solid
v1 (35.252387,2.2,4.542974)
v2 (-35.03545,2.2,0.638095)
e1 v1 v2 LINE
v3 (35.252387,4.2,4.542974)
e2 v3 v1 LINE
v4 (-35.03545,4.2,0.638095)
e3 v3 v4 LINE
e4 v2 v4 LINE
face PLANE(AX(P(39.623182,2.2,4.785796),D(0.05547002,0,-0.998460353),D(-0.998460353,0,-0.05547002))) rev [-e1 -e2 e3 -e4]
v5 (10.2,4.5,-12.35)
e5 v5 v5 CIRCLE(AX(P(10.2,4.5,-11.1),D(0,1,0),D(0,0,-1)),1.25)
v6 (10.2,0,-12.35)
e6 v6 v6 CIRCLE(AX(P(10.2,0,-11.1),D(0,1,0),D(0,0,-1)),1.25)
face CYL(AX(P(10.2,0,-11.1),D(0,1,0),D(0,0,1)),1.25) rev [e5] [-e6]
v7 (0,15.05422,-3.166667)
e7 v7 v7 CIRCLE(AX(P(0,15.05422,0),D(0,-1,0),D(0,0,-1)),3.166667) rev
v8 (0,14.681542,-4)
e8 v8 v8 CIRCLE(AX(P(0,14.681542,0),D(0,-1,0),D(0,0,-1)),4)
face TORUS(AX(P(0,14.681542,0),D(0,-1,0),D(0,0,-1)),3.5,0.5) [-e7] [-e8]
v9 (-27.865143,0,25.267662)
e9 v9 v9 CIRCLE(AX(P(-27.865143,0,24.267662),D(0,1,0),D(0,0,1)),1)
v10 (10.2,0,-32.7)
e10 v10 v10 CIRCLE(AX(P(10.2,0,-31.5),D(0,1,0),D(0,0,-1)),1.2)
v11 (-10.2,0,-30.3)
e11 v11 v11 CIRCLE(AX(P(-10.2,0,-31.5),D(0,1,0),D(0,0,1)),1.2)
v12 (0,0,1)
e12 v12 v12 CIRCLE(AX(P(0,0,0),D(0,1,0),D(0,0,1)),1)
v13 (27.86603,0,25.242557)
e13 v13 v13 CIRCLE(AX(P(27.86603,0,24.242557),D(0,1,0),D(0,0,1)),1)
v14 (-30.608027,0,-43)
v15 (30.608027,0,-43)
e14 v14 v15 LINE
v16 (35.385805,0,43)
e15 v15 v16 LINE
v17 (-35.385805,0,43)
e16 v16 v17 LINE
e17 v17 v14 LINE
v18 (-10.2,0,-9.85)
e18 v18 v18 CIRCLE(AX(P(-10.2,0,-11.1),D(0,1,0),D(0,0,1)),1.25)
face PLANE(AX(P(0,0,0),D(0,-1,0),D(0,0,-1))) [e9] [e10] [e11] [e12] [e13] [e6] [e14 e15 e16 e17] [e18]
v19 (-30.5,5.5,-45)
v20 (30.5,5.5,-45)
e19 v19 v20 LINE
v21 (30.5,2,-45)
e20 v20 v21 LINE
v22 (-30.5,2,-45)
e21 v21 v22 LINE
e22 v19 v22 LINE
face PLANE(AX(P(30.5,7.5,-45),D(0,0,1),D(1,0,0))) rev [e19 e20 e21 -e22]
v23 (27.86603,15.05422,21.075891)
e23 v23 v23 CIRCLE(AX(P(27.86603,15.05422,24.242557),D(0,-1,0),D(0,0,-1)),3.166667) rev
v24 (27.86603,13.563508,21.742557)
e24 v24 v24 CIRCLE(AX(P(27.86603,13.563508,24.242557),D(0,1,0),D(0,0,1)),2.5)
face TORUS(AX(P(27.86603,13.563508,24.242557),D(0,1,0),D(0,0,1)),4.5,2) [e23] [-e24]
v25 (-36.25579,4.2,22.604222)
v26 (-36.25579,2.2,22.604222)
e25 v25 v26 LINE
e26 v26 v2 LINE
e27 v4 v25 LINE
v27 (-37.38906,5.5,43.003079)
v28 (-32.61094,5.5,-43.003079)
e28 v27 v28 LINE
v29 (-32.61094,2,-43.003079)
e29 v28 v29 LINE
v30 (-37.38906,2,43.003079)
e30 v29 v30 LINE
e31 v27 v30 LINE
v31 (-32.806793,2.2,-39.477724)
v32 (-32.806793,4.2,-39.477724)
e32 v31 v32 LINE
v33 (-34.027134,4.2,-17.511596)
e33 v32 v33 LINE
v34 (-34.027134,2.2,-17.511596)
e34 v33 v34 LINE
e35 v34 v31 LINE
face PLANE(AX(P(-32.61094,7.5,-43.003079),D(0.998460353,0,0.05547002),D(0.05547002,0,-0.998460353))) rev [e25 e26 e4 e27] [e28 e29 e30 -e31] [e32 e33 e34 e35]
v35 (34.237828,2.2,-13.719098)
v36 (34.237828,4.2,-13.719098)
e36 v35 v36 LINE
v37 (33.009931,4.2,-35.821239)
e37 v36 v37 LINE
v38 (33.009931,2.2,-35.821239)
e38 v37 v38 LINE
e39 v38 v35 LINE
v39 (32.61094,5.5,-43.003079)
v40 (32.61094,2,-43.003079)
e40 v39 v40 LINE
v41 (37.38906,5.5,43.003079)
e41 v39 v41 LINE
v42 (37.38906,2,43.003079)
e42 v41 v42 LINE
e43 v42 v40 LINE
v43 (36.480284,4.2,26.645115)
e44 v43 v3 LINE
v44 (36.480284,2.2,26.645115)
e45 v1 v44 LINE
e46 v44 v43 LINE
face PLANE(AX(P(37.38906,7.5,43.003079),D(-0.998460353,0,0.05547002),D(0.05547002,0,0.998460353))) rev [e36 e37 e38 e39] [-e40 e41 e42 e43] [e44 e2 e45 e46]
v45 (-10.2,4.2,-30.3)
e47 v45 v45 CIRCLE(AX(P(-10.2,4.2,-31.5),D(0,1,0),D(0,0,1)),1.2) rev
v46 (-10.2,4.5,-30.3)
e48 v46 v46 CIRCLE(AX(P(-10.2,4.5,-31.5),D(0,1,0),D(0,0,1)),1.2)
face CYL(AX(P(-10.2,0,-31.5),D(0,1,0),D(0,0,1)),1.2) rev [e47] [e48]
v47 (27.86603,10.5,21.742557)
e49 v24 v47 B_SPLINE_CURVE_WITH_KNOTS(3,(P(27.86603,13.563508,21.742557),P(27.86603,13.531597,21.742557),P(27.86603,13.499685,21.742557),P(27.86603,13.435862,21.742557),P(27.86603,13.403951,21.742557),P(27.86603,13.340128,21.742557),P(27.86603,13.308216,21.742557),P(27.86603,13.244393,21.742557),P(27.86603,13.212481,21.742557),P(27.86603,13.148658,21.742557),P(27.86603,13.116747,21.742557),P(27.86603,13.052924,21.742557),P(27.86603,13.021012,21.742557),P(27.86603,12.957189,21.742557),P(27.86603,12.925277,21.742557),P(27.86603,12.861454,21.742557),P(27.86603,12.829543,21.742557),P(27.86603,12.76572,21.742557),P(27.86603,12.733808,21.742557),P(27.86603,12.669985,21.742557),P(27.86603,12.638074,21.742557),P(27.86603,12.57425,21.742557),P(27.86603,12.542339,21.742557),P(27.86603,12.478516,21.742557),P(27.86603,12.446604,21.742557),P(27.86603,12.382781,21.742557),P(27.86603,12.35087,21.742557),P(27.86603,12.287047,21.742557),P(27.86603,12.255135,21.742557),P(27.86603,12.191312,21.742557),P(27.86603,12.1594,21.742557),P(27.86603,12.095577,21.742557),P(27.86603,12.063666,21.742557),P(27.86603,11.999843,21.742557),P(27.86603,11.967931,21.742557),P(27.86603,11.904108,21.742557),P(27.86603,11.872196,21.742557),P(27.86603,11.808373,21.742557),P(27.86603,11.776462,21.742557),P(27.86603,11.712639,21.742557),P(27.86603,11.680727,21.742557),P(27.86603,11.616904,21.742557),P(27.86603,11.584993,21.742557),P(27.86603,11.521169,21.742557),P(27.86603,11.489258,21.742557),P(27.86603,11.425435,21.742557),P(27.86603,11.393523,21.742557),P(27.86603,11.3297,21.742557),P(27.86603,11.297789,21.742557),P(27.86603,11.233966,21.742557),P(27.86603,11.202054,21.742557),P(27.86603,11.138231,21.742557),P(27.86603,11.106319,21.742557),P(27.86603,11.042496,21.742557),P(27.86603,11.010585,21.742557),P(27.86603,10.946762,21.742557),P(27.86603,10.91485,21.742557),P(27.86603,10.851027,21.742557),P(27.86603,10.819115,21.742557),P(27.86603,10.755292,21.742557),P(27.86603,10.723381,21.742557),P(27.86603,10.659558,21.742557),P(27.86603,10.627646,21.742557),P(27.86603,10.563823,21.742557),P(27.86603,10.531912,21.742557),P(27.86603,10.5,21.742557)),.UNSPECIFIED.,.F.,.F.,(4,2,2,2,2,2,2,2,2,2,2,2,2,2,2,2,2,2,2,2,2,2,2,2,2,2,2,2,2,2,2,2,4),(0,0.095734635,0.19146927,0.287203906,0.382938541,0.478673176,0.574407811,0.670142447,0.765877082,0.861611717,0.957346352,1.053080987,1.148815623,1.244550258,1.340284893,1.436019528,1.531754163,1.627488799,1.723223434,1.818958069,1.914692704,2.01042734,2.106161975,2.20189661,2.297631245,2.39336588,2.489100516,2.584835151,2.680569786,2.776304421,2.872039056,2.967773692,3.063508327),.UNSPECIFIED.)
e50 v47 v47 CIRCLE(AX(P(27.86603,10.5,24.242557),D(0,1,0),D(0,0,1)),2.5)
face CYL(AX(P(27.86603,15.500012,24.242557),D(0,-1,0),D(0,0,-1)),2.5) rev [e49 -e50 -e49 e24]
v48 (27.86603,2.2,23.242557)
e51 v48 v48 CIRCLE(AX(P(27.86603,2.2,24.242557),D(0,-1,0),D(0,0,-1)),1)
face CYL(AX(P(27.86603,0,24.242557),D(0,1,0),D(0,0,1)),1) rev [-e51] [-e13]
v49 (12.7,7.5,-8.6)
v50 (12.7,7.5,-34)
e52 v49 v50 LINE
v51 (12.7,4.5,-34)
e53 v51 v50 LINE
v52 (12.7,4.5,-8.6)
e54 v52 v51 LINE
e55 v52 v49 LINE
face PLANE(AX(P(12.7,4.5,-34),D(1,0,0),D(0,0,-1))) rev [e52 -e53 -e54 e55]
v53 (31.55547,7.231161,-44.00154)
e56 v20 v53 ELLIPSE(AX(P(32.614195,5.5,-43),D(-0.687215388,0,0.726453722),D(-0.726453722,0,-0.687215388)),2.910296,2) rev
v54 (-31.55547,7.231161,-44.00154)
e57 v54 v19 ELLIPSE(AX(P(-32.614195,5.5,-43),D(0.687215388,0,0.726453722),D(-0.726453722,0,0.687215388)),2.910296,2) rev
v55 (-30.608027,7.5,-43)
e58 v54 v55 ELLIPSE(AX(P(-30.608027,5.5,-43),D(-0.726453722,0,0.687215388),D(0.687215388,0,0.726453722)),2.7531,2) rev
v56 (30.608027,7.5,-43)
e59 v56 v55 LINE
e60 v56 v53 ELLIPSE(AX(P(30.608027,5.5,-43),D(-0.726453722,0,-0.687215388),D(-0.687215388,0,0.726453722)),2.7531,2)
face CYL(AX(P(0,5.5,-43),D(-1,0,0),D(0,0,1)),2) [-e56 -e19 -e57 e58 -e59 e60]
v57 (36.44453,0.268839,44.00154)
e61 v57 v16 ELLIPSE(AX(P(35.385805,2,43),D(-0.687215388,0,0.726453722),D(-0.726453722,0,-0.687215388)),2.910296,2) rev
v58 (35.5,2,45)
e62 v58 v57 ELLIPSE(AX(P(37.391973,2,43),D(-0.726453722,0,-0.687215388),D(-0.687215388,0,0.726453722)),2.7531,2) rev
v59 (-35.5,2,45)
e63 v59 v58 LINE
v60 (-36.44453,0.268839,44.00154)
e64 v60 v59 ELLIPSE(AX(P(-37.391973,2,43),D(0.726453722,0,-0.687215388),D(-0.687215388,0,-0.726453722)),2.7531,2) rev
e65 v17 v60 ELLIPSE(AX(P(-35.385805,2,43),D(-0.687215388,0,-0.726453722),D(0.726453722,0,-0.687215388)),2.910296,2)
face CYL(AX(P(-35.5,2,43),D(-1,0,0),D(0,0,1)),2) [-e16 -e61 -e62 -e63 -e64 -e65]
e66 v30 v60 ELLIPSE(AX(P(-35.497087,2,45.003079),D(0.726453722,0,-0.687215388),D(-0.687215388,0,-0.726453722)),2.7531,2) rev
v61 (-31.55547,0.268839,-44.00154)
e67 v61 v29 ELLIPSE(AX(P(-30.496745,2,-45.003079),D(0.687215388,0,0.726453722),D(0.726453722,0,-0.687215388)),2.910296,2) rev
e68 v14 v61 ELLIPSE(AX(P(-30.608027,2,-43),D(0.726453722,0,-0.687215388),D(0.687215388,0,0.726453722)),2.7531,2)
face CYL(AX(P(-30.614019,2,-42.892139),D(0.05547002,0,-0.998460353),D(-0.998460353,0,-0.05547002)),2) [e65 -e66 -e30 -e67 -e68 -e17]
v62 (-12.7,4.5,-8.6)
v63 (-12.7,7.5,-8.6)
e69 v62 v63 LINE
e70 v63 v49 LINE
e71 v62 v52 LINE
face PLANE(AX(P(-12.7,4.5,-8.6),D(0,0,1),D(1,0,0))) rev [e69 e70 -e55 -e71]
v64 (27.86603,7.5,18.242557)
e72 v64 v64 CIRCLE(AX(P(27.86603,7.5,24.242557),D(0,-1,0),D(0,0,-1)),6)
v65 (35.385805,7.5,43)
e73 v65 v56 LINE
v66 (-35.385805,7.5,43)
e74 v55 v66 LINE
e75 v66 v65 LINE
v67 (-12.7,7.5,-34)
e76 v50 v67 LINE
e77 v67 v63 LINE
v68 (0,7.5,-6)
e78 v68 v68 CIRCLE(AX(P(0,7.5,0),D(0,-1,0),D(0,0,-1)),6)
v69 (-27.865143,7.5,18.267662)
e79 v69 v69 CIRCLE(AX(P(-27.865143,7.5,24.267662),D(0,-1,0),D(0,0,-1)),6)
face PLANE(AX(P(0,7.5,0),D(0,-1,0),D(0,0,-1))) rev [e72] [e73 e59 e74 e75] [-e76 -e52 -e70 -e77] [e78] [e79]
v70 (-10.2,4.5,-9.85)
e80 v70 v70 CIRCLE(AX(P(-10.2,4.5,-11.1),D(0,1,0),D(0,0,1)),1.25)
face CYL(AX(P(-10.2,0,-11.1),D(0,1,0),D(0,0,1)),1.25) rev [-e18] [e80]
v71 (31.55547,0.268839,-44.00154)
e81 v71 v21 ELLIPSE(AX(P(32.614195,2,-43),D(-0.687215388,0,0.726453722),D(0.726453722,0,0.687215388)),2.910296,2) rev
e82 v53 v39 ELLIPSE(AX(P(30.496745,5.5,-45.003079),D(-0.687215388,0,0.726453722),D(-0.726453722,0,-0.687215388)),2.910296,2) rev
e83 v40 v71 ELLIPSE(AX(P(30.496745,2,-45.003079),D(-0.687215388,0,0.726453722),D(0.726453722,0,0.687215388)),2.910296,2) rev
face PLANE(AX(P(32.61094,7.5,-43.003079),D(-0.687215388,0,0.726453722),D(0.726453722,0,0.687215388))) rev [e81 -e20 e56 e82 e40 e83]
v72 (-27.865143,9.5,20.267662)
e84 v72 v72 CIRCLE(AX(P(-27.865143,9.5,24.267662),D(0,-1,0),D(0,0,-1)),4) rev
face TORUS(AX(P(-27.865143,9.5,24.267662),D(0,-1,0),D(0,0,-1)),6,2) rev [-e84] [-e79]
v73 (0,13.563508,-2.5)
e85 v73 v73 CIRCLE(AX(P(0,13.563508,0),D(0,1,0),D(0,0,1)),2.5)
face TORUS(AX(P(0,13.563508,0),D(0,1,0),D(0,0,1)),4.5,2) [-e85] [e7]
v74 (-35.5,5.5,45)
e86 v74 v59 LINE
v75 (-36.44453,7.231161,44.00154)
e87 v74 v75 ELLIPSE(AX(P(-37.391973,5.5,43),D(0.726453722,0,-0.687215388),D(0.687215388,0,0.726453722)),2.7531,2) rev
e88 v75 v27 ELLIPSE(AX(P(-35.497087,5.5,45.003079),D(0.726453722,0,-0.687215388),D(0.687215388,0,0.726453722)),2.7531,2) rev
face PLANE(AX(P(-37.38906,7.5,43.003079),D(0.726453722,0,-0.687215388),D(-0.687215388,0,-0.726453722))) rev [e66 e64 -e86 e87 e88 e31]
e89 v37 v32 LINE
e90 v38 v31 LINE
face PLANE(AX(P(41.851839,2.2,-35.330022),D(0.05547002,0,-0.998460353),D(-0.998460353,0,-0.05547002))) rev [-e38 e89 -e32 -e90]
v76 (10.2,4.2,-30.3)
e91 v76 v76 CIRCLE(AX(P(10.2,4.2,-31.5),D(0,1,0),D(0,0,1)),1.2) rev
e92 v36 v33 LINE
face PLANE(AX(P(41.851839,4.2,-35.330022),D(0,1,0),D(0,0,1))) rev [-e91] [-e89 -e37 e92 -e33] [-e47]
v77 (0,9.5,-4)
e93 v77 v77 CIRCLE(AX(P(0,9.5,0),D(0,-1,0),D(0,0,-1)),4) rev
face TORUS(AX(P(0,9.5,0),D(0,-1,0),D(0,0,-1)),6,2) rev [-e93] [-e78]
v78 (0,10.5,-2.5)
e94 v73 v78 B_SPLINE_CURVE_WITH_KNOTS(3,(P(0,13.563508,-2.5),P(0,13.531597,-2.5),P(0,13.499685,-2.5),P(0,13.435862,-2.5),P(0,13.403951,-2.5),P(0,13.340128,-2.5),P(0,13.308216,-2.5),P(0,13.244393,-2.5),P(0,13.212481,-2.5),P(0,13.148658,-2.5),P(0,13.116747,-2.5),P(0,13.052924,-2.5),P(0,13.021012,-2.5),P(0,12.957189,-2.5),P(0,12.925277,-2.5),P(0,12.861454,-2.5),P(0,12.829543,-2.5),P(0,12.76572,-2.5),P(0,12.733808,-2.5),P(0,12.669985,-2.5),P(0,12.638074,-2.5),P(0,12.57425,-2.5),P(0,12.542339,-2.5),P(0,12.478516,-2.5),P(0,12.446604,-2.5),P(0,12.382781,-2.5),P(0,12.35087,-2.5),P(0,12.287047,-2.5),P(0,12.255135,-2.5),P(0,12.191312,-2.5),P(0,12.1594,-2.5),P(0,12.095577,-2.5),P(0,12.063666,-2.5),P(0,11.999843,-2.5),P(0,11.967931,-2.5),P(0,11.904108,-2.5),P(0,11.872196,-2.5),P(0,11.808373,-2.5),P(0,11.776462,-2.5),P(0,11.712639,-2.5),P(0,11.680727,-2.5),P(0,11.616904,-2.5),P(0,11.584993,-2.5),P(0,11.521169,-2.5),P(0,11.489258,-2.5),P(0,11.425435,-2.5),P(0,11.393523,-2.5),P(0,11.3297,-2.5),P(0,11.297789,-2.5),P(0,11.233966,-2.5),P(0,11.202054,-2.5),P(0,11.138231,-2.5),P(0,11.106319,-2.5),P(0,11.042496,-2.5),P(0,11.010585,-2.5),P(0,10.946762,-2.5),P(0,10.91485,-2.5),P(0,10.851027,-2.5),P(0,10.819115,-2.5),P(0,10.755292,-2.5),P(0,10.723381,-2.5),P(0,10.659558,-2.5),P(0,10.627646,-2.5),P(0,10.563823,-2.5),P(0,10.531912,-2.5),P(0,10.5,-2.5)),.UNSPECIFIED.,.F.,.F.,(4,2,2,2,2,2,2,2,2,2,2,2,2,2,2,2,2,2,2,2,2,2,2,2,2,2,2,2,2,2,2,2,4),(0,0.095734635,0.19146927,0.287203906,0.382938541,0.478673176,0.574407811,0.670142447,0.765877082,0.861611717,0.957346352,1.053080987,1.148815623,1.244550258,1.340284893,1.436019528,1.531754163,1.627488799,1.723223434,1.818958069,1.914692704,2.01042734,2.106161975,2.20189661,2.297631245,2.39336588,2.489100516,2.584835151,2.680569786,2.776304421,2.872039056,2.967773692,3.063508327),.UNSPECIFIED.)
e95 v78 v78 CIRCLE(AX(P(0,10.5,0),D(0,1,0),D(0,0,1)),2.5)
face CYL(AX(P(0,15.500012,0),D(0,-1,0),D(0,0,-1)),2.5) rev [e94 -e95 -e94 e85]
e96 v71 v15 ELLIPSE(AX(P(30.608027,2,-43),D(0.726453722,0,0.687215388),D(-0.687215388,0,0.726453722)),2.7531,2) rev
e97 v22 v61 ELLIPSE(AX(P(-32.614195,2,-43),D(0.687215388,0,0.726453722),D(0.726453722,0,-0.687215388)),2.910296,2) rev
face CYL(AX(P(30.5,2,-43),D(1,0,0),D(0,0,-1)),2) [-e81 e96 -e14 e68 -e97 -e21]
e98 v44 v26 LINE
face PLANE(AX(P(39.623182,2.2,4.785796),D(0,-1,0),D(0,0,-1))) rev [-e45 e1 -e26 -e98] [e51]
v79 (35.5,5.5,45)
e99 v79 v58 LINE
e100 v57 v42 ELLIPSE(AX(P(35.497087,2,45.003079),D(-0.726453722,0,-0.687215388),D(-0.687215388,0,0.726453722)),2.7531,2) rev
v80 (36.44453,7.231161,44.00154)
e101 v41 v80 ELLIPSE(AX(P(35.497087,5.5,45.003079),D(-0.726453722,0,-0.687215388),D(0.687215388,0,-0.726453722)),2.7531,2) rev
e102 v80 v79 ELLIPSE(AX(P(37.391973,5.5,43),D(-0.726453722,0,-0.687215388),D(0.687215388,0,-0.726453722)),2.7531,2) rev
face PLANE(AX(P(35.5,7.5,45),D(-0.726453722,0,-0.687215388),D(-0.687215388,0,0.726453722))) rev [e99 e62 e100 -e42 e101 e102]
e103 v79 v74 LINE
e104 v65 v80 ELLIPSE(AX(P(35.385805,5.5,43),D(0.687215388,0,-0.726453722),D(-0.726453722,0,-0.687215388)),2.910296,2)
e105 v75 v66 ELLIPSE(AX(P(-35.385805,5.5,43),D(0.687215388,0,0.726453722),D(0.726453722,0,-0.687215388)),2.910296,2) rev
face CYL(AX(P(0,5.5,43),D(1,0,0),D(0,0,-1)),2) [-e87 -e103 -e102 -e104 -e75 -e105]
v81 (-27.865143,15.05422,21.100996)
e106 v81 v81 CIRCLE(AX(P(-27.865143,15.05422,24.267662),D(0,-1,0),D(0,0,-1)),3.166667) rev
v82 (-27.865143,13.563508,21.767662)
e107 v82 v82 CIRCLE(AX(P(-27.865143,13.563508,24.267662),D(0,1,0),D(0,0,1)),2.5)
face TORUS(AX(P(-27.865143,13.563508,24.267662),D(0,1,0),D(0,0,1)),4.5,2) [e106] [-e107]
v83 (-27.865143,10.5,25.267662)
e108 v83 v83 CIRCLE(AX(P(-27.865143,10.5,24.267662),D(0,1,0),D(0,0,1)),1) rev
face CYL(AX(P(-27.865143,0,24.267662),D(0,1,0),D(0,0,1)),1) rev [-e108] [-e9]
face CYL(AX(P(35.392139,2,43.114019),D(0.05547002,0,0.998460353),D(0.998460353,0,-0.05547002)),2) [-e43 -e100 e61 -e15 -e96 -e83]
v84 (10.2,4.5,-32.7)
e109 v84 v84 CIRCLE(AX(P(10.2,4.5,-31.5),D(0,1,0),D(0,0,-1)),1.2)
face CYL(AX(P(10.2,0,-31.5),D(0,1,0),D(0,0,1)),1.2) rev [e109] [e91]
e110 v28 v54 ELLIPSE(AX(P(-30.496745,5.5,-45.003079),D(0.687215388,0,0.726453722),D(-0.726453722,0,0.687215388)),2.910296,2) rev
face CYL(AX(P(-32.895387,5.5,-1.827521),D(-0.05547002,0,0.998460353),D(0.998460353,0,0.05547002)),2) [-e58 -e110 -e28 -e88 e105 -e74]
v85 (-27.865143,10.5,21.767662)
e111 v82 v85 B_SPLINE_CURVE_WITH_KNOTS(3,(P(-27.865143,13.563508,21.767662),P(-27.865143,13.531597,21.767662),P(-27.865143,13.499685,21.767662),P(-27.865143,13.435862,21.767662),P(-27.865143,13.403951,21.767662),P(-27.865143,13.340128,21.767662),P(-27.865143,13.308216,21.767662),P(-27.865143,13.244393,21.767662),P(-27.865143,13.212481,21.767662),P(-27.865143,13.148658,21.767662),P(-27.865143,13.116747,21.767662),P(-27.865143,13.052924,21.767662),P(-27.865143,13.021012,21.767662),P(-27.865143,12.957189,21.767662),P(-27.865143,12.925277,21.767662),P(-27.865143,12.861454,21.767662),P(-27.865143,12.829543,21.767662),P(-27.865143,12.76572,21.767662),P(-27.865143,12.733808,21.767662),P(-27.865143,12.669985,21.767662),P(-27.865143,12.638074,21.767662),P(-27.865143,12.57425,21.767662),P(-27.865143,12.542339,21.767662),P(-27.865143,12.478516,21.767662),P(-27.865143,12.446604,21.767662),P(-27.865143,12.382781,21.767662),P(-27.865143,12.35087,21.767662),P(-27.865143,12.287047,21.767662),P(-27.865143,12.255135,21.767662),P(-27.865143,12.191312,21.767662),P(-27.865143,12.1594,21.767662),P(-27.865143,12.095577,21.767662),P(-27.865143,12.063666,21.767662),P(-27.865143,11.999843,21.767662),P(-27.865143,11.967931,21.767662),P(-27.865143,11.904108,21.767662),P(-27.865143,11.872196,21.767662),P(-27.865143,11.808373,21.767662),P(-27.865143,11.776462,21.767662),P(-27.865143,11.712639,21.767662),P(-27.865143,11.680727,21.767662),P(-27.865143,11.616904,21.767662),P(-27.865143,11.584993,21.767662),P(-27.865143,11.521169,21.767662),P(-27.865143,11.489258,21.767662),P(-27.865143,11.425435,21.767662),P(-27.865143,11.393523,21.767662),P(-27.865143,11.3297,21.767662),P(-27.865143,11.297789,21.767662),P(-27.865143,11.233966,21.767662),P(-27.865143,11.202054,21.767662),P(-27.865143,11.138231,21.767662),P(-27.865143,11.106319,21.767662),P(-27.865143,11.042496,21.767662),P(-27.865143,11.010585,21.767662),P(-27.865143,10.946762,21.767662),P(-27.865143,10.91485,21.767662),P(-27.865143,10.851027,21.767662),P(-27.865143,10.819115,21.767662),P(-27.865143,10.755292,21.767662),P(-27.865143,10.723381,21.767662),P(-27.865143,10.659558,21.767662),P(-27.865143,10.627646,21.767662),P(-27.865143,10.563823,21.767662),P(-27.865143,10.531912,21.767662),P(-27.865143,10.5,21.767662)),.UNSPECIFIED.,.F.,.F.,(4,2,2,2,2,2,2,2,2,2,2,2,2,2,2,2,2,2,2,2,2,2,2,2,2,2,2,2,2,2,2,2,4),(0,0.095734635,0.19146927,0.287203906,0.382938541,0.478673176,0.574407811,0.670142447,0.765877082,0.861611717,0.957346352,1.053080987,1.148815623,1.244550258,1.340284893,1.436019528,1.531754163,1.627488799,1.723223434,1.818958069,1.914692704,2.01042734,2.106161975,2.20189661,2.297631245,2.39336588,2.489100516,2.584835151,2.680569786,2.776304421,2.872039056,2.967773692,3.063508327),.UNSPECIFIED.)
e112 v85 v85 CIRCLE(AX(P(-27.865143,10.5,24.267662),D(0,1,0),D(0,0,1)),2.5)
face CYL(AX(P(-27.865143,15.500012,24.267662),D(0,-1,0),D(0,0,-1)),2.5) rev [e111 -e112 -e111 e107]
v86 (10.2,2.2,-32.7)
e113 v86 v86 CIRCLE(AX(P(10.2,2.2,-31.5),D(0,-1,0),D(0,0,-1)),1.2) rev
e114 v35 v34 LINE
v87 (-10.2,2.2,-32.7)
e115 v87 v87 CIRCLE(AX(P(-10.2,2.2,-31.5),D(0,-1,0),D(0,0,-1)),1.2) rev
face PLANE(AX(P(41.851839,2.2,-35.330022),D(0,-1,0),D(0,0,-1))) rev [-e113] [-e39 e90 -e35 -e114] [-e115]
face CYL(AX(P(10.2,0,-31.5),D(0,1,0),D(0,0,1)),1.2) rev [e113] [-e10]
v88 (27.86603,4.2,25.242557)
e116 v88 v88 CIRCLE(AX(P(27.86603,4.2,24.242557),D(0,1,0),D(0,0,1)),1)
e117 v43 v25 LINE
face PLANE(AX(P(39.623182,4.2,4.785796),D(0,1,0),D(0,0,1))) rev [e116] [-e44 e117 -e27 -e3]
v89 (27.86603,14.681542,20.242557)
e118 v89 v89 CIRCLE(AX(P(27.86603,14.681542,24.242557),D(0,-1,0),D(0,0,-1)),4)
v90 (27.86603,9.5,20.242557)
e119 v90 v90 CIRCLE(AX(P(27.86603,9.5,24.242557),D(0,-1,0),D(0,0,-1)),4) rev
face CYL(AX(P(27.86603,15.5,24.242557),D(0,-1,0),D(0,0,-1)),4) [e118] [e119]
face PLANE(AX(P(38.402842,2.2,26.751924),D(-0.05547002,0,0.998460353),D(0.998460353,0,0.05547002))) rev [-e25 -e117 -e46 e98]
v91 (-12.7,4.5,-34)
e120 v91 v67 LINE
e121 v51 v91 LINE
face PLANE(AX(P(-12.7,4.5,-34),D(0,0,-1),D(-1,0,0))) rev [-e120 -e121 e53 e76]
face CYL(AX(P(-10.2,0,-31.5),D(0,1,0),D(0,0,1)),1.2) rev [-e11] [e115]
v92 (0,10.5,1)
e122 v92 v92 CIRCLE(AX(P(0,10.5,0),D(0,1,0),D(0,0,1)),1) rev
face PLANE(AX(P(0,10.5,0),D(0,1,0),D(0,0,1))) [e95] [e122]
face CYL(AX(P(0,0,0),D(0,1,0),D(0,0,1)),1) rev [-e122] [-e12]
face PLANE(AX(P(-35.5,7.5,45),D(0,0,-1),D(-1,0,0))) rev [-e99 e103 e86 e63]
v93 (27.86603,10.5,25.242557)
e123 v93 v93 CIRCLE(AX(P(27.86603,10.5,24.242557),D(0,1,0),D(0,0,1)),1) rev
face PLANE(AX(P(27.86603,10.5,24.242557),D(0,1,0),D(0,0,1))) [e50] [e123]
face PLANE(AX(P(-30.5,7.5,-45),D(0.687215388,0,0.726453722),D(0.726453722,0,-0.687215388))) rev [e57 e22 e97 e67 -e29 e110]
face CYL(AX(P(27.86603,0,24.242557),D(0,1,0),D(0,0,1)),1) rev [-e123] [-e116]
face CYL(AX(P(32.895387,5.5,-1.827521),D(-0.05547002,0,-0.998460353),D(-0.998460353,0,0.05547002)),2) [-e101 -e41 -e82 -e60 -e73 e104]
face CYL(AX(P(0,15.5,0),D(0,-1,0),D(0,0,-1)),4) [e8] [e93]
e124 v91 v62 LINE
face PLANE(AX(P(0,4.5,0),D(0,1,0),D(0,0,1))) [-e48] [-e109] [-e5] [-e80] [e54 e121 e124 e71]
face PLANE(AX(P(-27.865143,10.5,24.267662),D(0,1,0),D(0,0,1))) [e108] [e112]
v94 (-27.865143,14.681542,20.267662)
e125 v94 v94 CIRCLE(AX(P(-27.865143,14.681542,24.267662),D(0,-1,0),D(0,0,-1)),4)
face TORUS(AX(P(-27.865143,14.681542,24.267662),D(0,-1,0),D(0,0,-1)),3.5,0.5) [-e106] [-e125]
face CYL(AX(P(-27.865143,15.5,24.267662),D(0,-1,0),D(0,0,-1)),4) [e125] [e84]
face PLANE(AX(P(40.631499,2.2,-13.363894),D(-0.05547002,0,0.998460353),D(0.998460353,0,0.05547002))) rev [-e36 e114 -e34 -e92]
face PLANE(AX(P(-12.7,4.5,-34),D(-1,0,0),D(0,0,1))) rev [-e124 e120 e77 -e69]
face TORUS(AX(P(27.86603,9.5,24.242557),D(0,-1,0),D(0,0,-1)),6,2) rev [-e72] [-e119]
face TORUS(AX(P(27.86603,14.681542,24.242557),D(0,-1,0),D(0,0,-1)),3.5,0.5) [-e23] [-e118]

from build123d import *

# Parameters (mm, degrees)
BOSS_EXTRUDE2_DEPTH     = 7.5
SKETCH6_W               = 25.4
SKETCH6_H               = 25.4
CUT_EXTRUDE2_DEPTH      = 3
SKETCH8_R               = 1.2
SKETCH8_R_2             = 1.25
CUT_EXTRUDE3_DEPTH      = 59.678716795
SKETCH9_R               = 4
BOSS_EXTRUDE5_DEPTH     = 8
CUT_EXTRUDE4_DEPTH      = 88.567489866
CUT_EXTRUDE4_DEPTH_BACK = 88.567489866
SKETCH11_W              = 22
SKETCH11_H              = 2
CUT_EXTRUDE5_DEPTH      = 61.524307553
CUT_EXTRUDE5_DEPTH_BACK = 61.524307553
SKETCH12_R              = 1
CUT_EXTRUDE6_DEPTH      = 61.524307553
CUT_EXTRUDE6_DEPTH_BACK = 5
SKETCH13_R              = 2.5
FILLET1_R               = 2
FILLET2_R               = 2
FILLET3_R               = 0.5
FILLET4_R               = 2


with BuildPart() as part:
    # Sketch2 → Boss-Extrude2 (new body)
    with BuildSketch(Plane(origin=(0, 0, 0), x_dir=(1, 0, 0), z_dir=(0, 1, 0))):
        Polygon((-35.5, -45), (35.5, -45), (37.389059961, -43.003079294), (32.610940039, 43.003079294), (30.5, 45), (-30.5, 45), (-32.610940039, 43.003079294), (-37.389059961, -43.003079294), align=None)
    extrude(amount=BOSS_EXTRUDE2_DEPTH)

    # Sketch6 → Cut-Extrude2 (cut)
    with BuildSketch(Plane(origin=(0, 7.5, 0), x_dir=(1, 0, 0), z_dir=(0, 1, 0))):
        with Locations((0, 21.3)):
            Rectangle(SKETCH6_W, SKETCH6_H)
    extrude(amount=-CUT_EXTRUDE2_DEPTH, mode=Mode.SUBTRACT)

    # Sketch8 → Cut-Extrude3 (cut, through all)
    with BuildSketch(Plane(origin=(0, 4.5, 0), x_dir=(1, 0, 0), z_dir=(0, 1, 0))):
        with Locations(Location((-10.2, 31.5, 0), (0, 0, 270))):
            Circle(SKETCH8_R)
        with Locations(Location((-10.2, 11.1, 0), (0, 0, 270))):
            Circle(SKETCH8_R_2)
        with Locations(Location((10.2, 11.1, 0), (0, 0, 90))):
            Circle(SKETCH8_R_2)
        with Locations(Location((10.2, 31.5, 0), (0, 0, 90))):
            Circle(SKETCH8_R)
    extrude(amount=-CUT_EXTRUDE3_DEPTH, mode=Mode.SUBTRACT)

    # Sketch9 → Boss-Extrude5 (add)
    with BuildSketch(Plane(origin=(0, 7.5, 0), x_dir=(1, 0, 0), z_dir=(0, 1, 0))):
        with Locations(Location((-27.865142546, -24.267662345, 0), (0, 0, 90))):
            Circle(SKETCH9_R)
        with Locations(Location((27.866029503, -24.242557469, 0), (0, 0, 90))):
            Circle(SKETCH9_R)
        with Locations(Location((0, 0, 0), (0, 0, 90))):
            Circle(SKETCH9_R)
    extrude(amount=BOSS_EXTRUDE5_DEPTH)

    # Sketch11 → Cut-Extrude4 (cut, two sides: drawn at the far end of the back side and taken through both)
    with BuildSketch(Plane(origin=(-34.892307692, 0, -1.938461538), x_dir=(-0.05547001962252269, 0, 0.9984603532054125), z_dir=(-0.9984603532054126, 0, -0.055470019622522695)).offset(-CUT_EXTRUDE4_DEPTH_BACK)):
        with Locations((-26.597148694, 3.2)):
            Rectangle(SKETCH11_W, SKETCH11_H)
        with Locations((13.580529235, 3.2)):
            Rectangle(SKETCH11_W, SKETCH11_H)
    extrude(amount=CUT_EXTRUDE4_DEPTH + CUT_EXTRUDE4_DEPTH_BACK, mode=Mode.SUBTRACT)

    # Sketch12 → Cut-Extrude5 (cut, two sides: drawn at the far end of the back side and taken through both)
    with BuildSketch(Plane(origin=(0, 15.5, 0), x_dir=(1, 0, 0), z_dir=(0, 1, 0)).offset(-CUT_EXTRUDE5_DEPTH_BACK)):
        with Locations(Location((-27.865142546, -24.267662345, 0), (0, 0, 270))):
            Circle(SKETCH12_R)
        with Locations(Location((0, 0, 0), (0, 0, 270))):
            Circle(SKETCH12_R)
        with Locations(Location((27.866029503, -24.242557469, 0), (0, 0, 270))):
            Circle(SKETCH12_R)
    extrude(amount=CUT_EXTRUDE5_DEPTH + CUT_EXTRUDE5_DEPTH_BACK, mode=Mode.SUBTRACT)

    # Sketch13 → Cut-Extrude6 (cut, two sides: drawn at the far end of the back side and taken through both)
    with BuildSketch(Plane(origin=(0, 15.5, 0), x_dir=(1, 0, 0), z_dir=(0, 1, 0)).offset(-CUT_EXTRUDE6_DEPTH_BACK)):
        with Locations(Location((-27.865142546, -24.267662345, 0), (0, 0, 90))):
            Circle(SKETCH13_R)
        with Locations(Location((0, 0, 0), (0, 0, 90))):
            Circle(SKETCH13_R)
        with Locations(Location((27.866029503, -24.242557469, 0), (0, 0, 90))):
            Circle(SKETCH13_R)
    extrude(amount=CUT_EXTRUDE6_DEPTH + CUT_EXTRUDE6_DEPTH_BACK, mode=Mode.SUBTRACT)

    # Fillet1
    # the kernel refuses this fillet: 2 mm, written as the material it takes off along each edge
    with BuildSketch(Plane(origin=(35.5, 0, -45), x_dir=(0, 0, 1), z_dir=(-1, 0, 0))) as fillet1_piece_1:
        with BuildLine():
            CenterArc((FILLET1_R, FILLET1_R), FILLET1_R, 180, 90)
            Line((0, FILLET1_R), (0, 0))
            Line((0, 0), (FILLET1_R, 0))
        make_face()
    extrude(amount=71, mode=Mode.SUBTRACT)
    with BuildSketch(Plane(origin=(35.5, 7.5, -45), x_dir=(0, 0, 1), z_dir=(-1, 0, 0))) as fillet1_piece_2:
        with BuildLine():
            CenterArc((FILLET1_R, -FILLET1_R), FILLET1_R, 90, 90)
            Line((0, -FILLET1_R), (0, 0))
            Line((0, 0), (FILLET1_R, 0))
        make_face()
    extrude(amount=71, mode=Mode.SUBTRACT)
    with BuildSketch(Plane(origin=(37.666410059, 0, 47.99538106), x_dir=(-0.9984603532054125, 0, 0.055470019622522966), z_dir=(-0.05547001962252297, 0, -0.9984603532054125)), Plane(origin=(-32.333589941, 0, -47.99538106), x_dir=(0.9984603532054126, 0, 0.055470019622522654), z_dir=(-0.05547001962252265, 0, 0.9984603532054125))) as fillet1_piece_3:
        with BuildLine():
            CenterArc((FILLET1_R, FILLET1_R), FILLET1_R, 180, 90)
            Line((0, FILLET1_R), (0, 0))
            Line((0, 0), (FILLET1_R, 0))
        make_face()
    extrude(amount=96.138781887, mode=Mode.SUBTRACT)
    with BuildSketch(Plane(origin=(37.666410059, 7.5, 47.99538106), x_dir=(-0.9984603532054125, 0, 0.055470019622522966), z_dir=(-0.05547001962252297, 0, -0.9984603532054125)), Plane(origin=(-32.333589941, 7.5, -47.99538106), x_dir=(0.9984603532054126, 0, 0.055470019622522654), z_dir=(-0.05547001962252265, 0, 0.9984603532054125))) as fillet1_piece_4:
        with BuildLine():
            CenterArc((FILLET1_R, -FILLET1_R), FILLET1_R, 90, 90)
            Line((0, -FILLET1_R), (0, 0))
            Line((0, 0), (FILLET1_R, 0))
        make_face()
    extrude(amount=96.138781887, mode=Mode.SUBTRACT)
    with BuildSketch(Plane(origin=(-40.5, 7.5, 45), x_dir=(0, -1, 0), z_dir=(1, 0, 0))) as fillet1_piece_5:
        with BuildLine():
            CenterArc((FILLET1_R, FILLET1_R), FILLET1_R, 180, 90)
            Line((0, FILLET1_R), (0, 0))
            Line((0, 0), (FILLET1_R, 0))
        make_face()
    extrude(amount=81, mode=Mode.SUBTRACT)
    with BuildSketch(Plane(origin=(-40.5, 0, 45), x_dir=(0, 1, 0), z_dir=(1, 0, 0))) as fillet1_piece_6:
        with BuildLine():
            CenterArc((FILLET1_R, -FILLET1_R), FILLET1_R, 90, 90)
            Line((0, -FILLET1_R), (0, 0))
            Line((0, 0), (FILLET1_R, 0))
        make_face()
    extrude(amount=81, mode=Mode.SUBTRACT)

    # Fillet2
    # the kernel refuses this fillet: 2 mm, written as the material it takes off along each edge
    with BuildSketch(Plane(origin=(-27.865142546, 15.5, 24.267662345), x_dir=(0, 0, -1), z_dir=(1, 0, 0))) as fillet2_piece_1:
        with BuildLine():
            CenterArc((4.5, -1.936491673), FILLET2_R, 104.477512186, 75.522487814)
            Line((2.5, -1.936491673), (2.46, -1.936491673))
            Line((2.46, -1.936491673), (2.46, 0))
            Line((2.46, 0), (2.5, 0.04))
            ThreePointArc((2.5, 0.04), (3.25, 0.04), (3.99, 0.038729833))
            Line((3.99, 0.038729833), (4, 0))
        make_face()
    revolve(axis=Axis((-27.865142546, 15.5, 24.267662345), (0, 1, 0)), mode=Mode.SUBTRACT)
    with BuildSketch(Plane(origin=(0, 15.5, 0), x_dir=(0, 0, -1), z_dir=(1, 0, 0))) as fillet2_piece_2:
        with BuildLine():
            CenterArc((4.5, -1.936491673), FILLET2_R, 104.477512186, 75.522487814)
            Line((2.5, -1.936491673), (2.46, -1.936491673))
            Line((2.46, -1.936491673), (2.46, 0))
            Line((2.46, 0), (2.5, 0.04))
            ThreePointArc((2.5, 0.04), (3.25, 0.04), (3.99, 0.038729833))
            Line((3.99, 0.038729833), (4, 0))
        make_face()
    revolve(axis=Axis((0, 15.5, 0), (0, 1, 0)), mode=Mode.SUBTRACT)
    with BuildSketch(Plane(origin=(27.866029503, 15.5, 24.242557469), x_dir=(0, 0, -1), z_dir=(1, 0, 0))) as fillet2_piece_3:
        with BuildLine():
            CenterArc((4.5, -1.936491673), FILLET2_R, 104.477512186, 75.522487814)
            Line((2.5, -1.936491673), (2.46, -1.936491673))
            Line((2.46, -1.936491673), (2.46, 0))
            Line((2.46, 0), (2.5, 0.04))
            ThreePointArc((2.5, 0.04), (3.25, 0.04), (3.99, 0.038729833))
            Line((3.99, 0.038729833), (4, 0))
        make_face()
    revolve(axis=Axis((27.866029503, 15.5, 24.242557469), (0, 1, 0)), mode=Mode.SUBTRACT)

    # Fillet3
    fillet3_edges = [part.edges().sort_by_distance(p)[0] for p in [
        (-27.865142546, 15.5, 28.267662345),
        (27.866029503, 15.5, 28.242557469),
        (0, 15.5, 4),
    ]]
    fillet(fillet3_edges, radius=FILLET3_R)

    # Fillet4
    fillet4_edges = [part.edges().sort_by_distance(p)[0] for p in [
        (-27.865142546, 7.5, 28.267662345),
        (27.866029503, 7.5, 28.242557469),
        (0, 7.5, 4),
    ]]
    fillet(fillet4_edges, radius=FILLET4_R)


solid = part.part
